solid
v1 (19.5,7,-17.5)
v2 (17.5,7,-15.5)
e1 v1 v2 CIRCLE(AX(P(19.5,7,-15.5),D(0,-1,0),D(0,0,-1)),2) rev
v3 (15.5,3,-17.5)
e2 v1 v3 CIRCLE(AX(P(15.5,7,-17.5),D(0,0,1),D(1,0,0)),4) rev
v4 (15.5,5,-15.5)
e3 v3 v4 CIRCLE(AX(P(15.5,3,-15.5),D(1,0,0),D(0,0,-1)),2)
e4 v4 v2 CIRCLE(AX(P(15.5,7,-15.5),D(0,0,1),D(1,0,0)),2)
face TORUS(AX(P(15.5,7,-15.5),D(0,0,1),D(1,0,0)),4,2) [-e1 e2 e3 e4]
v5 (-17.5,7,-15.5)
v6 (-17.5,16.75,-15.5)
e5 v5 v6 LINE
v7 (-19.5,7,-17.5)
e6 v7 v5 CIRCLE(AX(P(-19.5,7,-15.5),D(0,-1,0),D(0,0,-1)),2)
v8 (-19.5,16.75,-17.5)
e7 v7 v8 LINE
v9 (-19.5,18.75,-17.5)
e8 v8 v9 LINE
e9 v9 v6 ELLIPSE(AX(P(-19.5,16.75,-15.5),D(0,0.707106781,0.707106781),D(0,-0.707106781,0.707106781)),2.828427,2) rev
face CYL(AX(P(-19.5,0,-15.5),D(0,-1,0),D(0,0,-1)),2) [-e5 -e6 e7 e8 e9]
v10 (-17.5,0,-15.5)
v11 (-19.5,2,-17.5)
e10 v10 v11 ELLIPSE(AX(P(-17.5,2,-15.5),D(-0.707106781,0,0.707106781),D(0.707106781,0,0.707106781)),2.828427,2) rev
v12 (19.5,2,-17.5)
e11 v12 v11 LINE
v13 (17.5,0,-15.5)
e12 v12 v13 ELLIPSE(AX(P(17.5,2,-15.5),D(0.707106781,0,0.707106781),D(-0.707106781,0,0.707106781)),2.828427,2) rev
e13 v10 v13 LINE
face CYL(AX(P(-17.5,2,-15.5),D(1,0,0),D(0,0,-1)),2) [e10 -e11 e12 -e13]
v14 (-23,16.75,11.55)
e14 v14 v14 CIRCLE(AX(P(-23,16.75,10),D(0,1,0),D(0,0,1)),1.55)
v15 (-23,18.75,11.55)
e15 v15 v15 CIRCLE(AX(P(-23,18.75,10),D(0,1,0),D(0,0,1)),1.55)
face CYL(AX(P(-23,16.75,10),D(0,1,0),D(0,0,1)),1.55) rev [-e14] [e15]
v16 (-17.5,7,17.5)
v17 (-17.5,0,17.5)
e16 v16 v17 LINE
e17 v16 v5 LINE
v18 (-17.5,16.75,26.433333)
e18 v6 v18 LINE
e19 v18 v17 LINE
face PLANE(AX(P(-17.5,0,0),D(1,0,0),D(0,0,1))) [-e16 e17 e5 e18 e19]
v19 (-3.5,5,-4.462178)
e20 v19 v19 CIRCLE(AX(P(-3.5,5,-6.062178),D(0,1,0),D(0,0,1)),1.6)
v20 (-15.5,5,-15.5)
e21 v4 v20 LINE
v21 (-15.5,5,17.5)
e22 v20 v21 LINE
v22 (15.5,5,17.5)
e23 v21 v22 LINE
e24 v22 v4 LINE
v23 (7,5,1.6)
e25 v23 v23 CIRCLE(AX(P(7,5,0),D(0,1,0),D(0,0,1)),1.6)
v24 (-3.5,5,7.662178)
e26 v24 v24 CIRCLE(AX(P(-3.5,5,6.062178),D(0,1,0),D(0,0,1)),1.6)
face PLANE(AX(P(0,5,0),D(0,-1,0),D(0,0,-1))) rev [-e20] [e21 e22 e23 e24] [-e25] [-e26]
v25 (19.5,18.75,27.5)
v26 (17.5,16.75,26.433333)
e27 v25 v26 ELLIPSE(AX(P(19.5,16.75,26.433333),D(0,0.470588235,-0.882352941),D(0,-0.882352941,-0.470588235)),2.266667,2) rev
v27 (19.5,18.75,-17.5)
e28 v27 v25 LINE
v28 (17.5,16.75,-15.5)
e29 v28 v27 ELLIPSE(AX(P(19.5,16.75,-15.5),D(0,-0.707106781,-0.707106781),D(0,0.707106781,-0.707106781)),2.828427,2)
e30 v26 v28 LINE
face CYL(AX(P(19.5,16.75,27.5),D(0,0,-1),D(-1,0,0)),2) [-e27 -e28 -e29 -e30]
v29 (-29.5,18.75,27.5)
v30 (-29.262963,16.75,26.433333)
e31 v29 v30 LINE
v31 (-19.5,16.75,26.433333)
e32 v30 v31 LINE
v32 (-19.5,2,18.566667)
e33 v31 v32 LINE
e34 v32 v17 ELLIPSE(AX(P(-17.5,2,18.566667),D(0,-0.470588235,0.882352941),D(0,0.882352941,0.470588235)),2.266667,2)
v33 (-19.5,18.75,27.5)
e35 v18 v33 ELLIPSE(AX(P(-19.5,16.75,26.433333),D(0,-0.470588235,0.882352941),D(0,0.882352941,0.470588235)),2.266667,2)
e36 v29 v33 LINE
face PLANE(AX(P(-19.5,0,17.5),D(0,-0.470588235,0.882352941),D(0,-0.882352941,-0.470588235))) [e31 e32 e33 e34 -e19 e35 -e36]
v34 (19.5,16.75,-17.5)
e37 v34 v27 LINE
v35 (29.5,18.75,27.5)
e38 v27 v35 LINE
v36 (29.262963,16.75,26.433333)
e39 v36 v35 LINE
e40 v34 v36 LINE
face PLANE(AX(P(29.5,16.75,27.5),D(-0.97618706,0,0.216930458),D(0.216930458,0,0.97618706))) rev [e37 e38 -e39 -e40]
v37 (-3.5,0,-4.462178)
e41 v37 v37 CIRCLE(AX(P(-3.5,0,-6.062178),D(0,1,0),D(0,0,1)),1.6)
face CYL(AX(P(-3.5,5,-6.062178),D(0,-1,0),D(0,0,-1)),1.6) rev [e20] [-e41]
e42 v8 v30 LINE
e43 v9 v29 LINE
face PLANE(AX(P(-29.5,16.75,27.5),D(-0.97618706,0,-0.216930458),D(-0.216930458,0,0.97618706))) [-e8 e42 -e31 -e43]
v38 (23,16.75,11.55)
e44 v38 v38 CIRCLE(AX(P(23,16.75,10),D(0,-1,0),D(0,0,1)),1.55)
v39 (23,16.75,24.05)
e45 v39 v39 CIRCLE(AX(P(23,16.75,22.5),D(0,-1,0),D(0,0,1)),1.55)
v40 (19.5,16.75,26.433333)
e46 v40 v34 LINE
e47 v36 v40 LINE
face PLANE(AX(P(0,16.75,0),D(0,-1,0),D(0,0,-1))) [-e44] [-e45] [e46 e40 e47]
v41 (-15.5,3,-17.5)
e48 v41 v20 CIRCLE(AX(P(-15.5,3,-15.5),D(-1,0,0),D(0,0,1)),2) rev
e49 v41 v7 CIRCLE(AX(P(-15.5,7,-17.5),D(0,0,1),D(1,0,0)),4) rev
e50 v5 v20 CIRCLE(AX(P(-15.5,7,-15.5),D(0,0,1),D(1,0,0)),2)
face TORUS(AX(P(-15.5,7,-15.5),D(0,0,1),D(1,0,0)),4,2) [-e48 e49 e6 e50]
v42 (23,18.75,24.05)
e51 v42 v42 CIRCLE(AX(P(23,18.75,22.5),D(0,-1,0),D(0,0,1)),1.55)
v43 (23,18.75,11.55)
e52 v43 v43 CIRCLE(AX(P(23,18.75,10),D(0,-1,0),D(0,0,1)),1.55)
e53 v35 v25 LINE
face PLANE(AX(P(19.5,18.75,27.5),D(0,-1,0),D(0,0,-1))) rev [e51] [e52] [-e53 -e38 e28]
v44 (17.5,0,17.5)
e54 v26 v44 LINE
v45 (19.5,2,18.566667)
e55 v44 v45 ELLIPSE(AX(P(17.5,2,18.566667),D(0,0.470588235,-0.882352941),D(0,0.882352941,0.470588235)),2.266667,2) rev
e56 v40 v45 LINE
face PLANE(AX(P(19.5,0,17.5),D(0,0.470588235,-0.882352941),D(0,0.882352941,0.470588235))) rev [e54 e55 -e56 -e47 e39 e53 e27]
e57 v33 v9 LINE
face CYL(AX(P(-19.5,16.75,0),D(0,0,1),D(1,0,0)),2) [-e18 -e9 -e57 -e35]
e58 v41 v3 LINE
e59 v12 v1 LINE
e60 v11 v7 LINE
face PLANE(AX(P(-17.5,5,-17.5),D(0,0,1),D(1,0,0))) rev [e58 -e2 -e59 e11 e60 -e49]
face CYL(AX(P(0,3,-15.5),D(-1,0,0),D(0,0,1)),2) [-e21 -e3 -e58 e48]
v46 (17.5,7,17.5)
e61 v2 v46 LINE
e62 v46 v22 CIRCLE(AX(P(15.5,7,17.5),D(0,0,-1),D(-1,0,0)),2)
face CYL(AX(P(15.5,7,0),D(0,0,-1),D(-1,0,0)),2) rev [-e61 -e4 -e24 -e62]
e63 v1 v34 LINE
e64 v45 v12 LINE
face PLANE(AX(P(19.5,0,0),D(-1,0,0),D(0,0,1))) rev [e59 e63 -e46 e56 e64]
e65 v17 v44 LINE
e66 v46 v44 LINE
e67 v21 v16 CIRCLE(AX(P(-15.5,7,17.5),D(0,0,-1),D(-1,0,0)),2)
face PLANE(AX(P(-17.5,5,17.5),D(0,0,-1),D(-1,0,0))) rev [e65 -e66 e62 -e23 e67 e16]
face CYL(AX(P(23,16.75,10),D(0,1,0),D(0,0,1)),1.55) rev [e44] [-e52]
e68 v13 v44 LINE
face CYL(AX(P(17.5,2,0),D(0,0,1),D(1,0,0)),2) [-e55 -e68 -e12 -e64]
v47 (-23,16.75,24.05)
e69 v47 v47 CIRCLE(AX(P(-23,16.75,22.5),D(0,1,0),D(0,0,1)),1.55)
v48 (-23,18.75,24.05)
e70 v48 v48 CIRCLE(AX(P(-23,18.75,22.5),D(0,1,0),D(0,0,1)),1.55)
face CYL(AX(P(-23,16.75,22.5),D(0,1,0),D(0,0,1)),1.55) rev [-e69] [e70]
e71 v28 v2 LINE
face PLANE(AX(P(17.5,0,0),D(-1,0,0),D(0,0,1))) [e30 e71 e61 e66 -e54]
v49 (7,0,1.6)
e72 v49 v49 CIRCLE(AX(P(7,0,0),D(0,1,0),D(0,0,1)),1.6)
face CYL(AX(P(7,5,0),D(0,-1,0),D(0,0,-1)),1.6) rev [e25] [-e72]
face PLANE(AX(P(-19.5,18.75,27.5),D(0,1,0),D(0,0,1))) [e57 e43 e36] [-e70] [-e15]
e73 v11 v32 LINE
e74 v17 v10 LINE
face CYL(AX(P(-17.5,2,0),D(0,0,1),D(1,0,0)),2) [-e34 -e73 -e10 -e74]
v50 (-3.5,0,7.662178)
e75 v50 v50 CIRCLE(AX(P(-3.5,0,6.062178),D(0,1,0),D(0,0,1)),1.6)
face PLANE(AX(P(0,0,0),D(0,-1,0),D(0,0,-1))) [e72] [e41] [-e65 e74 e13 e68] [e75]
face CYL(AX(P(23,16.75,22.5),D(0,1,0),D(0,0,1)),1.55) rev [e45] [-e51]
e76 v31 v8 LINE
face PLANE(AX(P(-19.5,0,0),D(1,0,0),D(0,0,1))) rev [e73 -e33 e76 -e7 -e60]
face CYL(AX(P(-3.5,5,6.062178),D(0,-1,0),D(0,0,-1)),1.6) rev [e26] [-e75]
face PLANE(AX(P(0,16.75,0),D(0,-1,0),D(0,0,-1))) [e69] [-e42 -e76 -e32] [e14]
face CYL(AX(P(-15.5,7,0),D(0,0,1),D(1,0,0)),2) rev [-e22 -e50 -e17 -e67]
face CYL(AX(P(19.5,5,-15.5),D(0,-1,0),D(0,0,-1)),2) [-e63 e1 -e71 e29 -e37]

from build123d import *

# Parameters (mm, degrees)
SKETCH2_W           = 35
SKETCH2_H           = 35
SKETCH2_R           = 1.6
BOSS_EXTRUDE1_DEPTH = 5
BOSS_EXTRUDE2_DEPTH = 2
SKETCH4_R           = 1.55
BOSS_EXTRUDE3_DEPTH = 2
CUT_EXTRUDE1_DEPTH  = 52.27194652
FILLET1_R           = 2


with BuildPart() as part:
    # Sketch2 → Boss-Extrude1 (new body)
    with BuildSketch(Plane(origin=(0, 0, 0), x_dir=(1, 0, 0), z_dir=(0, 1, 0))):
        Rectangle(SKETCH2_W, SKETCH2_H)
        with Locations(Location((7, 0, 0), (0, 0, 270))):
            Circle(SKETCH2_R, mode=Mode.SUBTRACT)
        with Locations(Location((-3.5, -6.062177826, 0), (0, 0, 270))):
            Circle(SKETCH2_R, mode=Mode.SUBTRACT)
        with Locations(Location((-3.5, 6.062177826, 0), (0, 0, 270))):
            Circle(SKETCH2_R, mode=Mode.SUBTRACT)
    extrude(amount=BOSS_EXTRUDE1_DEPTH)

    # Sketch3 → Boss-Extrude2 (add)
    with BuildSketch(Plane(origin=(17.5, 0, 0), x_dir=(0, 0, -1), z_dir=(1, 0, 0))):
        Polygon((-17.5, 0), (-27.5, 18.75), (17.5, 18.75), (17.5, 0), align=None)
    boss_extrude2 = extrude(amount=BOSS_EXTRUDE2_DEPTH)

    # Mirror1: Boss-Extrude2 across plane
    add(boss_extrude2.mirror(Plane(origin=(0, 0, 0), x_dir=(0, 0, 1), z_dir=(1, 0, 0))))

    # Sketch4 → Boss-Extrude3 (add)
    with BuildSketch(Plane(origin=(0, 18.75, 0), x_dir=(1, 0, 0), z_dir=(0, 1, 0))):
        Polygon((-19.5, -27.5), (-29.5, -27.5), (-19.5, 17.5), align=None)
        with Locations(Location((-23, -22.5, 0), (0, 0, 270))):
            Circle(SKETCH4_R, mode=Mode.SUBTRACT)
        with Locations(Location((-23, -10, 0), (0, 0, 270))):
            Circle(SKETCH4_R, mode=Mode.SUBTRACT)
    boss_extrude3 = extrude(amount=-BOSS_EXTRUDE3_DEPTH)

    # Sketch5 → Cut-Extrude1 (cut, through all)
    with BuildSketch(Plane(origin=(-19.5, 0, 0), x_dir=(0, 0, -1), z_dir=(1, 0, 0))):
        Polygon((-27.5, 18.75), (-26.433333333, 16.75), (-27.5, 16.75), align=None)
    cut_extrude1 = extrude(amount=-CUT_EXTRUDE1_DEPTH, mode=Mode.SUBTRACT)

    # Mirror2: Boss-Extrude3, Cut-Extrude1 across plane
    add(boss_extrude3.mirror(Plane(origin=(0, 0, 0), x_dir=(0, 0, 1), z_dir=(1, 0, 0))))
    add(cut_extrude1.mirror(Plane(origin=(0, 0, 0), x_dir=(0, 0, 1), z_dir=(1, 0, 0))), mode=Mode.SUBTRACT)

    # Fillet1
    fillet1_edges = [part.edges().sort_by_distance(p)[0] for p in [
        (17.5, 11.875, -17.5),
        (-17.5, 11.875, -17.5),
        (-17.5, 18.75, 5),
        (17.5, 18.75, 5),
        (0, 5, -17.5),
        (0, 0, -17.5),
        (17.5, 5, 0),
        (-17.5, 5, 0),
        (-19.5, 0, 0),
        (19.5, 0, 0),
    ]]
    fillet(fillet1_edges, radius=FILLET1_R - 0.0001)  # a hair under: the kernel refuses the full size


solid = part.part
